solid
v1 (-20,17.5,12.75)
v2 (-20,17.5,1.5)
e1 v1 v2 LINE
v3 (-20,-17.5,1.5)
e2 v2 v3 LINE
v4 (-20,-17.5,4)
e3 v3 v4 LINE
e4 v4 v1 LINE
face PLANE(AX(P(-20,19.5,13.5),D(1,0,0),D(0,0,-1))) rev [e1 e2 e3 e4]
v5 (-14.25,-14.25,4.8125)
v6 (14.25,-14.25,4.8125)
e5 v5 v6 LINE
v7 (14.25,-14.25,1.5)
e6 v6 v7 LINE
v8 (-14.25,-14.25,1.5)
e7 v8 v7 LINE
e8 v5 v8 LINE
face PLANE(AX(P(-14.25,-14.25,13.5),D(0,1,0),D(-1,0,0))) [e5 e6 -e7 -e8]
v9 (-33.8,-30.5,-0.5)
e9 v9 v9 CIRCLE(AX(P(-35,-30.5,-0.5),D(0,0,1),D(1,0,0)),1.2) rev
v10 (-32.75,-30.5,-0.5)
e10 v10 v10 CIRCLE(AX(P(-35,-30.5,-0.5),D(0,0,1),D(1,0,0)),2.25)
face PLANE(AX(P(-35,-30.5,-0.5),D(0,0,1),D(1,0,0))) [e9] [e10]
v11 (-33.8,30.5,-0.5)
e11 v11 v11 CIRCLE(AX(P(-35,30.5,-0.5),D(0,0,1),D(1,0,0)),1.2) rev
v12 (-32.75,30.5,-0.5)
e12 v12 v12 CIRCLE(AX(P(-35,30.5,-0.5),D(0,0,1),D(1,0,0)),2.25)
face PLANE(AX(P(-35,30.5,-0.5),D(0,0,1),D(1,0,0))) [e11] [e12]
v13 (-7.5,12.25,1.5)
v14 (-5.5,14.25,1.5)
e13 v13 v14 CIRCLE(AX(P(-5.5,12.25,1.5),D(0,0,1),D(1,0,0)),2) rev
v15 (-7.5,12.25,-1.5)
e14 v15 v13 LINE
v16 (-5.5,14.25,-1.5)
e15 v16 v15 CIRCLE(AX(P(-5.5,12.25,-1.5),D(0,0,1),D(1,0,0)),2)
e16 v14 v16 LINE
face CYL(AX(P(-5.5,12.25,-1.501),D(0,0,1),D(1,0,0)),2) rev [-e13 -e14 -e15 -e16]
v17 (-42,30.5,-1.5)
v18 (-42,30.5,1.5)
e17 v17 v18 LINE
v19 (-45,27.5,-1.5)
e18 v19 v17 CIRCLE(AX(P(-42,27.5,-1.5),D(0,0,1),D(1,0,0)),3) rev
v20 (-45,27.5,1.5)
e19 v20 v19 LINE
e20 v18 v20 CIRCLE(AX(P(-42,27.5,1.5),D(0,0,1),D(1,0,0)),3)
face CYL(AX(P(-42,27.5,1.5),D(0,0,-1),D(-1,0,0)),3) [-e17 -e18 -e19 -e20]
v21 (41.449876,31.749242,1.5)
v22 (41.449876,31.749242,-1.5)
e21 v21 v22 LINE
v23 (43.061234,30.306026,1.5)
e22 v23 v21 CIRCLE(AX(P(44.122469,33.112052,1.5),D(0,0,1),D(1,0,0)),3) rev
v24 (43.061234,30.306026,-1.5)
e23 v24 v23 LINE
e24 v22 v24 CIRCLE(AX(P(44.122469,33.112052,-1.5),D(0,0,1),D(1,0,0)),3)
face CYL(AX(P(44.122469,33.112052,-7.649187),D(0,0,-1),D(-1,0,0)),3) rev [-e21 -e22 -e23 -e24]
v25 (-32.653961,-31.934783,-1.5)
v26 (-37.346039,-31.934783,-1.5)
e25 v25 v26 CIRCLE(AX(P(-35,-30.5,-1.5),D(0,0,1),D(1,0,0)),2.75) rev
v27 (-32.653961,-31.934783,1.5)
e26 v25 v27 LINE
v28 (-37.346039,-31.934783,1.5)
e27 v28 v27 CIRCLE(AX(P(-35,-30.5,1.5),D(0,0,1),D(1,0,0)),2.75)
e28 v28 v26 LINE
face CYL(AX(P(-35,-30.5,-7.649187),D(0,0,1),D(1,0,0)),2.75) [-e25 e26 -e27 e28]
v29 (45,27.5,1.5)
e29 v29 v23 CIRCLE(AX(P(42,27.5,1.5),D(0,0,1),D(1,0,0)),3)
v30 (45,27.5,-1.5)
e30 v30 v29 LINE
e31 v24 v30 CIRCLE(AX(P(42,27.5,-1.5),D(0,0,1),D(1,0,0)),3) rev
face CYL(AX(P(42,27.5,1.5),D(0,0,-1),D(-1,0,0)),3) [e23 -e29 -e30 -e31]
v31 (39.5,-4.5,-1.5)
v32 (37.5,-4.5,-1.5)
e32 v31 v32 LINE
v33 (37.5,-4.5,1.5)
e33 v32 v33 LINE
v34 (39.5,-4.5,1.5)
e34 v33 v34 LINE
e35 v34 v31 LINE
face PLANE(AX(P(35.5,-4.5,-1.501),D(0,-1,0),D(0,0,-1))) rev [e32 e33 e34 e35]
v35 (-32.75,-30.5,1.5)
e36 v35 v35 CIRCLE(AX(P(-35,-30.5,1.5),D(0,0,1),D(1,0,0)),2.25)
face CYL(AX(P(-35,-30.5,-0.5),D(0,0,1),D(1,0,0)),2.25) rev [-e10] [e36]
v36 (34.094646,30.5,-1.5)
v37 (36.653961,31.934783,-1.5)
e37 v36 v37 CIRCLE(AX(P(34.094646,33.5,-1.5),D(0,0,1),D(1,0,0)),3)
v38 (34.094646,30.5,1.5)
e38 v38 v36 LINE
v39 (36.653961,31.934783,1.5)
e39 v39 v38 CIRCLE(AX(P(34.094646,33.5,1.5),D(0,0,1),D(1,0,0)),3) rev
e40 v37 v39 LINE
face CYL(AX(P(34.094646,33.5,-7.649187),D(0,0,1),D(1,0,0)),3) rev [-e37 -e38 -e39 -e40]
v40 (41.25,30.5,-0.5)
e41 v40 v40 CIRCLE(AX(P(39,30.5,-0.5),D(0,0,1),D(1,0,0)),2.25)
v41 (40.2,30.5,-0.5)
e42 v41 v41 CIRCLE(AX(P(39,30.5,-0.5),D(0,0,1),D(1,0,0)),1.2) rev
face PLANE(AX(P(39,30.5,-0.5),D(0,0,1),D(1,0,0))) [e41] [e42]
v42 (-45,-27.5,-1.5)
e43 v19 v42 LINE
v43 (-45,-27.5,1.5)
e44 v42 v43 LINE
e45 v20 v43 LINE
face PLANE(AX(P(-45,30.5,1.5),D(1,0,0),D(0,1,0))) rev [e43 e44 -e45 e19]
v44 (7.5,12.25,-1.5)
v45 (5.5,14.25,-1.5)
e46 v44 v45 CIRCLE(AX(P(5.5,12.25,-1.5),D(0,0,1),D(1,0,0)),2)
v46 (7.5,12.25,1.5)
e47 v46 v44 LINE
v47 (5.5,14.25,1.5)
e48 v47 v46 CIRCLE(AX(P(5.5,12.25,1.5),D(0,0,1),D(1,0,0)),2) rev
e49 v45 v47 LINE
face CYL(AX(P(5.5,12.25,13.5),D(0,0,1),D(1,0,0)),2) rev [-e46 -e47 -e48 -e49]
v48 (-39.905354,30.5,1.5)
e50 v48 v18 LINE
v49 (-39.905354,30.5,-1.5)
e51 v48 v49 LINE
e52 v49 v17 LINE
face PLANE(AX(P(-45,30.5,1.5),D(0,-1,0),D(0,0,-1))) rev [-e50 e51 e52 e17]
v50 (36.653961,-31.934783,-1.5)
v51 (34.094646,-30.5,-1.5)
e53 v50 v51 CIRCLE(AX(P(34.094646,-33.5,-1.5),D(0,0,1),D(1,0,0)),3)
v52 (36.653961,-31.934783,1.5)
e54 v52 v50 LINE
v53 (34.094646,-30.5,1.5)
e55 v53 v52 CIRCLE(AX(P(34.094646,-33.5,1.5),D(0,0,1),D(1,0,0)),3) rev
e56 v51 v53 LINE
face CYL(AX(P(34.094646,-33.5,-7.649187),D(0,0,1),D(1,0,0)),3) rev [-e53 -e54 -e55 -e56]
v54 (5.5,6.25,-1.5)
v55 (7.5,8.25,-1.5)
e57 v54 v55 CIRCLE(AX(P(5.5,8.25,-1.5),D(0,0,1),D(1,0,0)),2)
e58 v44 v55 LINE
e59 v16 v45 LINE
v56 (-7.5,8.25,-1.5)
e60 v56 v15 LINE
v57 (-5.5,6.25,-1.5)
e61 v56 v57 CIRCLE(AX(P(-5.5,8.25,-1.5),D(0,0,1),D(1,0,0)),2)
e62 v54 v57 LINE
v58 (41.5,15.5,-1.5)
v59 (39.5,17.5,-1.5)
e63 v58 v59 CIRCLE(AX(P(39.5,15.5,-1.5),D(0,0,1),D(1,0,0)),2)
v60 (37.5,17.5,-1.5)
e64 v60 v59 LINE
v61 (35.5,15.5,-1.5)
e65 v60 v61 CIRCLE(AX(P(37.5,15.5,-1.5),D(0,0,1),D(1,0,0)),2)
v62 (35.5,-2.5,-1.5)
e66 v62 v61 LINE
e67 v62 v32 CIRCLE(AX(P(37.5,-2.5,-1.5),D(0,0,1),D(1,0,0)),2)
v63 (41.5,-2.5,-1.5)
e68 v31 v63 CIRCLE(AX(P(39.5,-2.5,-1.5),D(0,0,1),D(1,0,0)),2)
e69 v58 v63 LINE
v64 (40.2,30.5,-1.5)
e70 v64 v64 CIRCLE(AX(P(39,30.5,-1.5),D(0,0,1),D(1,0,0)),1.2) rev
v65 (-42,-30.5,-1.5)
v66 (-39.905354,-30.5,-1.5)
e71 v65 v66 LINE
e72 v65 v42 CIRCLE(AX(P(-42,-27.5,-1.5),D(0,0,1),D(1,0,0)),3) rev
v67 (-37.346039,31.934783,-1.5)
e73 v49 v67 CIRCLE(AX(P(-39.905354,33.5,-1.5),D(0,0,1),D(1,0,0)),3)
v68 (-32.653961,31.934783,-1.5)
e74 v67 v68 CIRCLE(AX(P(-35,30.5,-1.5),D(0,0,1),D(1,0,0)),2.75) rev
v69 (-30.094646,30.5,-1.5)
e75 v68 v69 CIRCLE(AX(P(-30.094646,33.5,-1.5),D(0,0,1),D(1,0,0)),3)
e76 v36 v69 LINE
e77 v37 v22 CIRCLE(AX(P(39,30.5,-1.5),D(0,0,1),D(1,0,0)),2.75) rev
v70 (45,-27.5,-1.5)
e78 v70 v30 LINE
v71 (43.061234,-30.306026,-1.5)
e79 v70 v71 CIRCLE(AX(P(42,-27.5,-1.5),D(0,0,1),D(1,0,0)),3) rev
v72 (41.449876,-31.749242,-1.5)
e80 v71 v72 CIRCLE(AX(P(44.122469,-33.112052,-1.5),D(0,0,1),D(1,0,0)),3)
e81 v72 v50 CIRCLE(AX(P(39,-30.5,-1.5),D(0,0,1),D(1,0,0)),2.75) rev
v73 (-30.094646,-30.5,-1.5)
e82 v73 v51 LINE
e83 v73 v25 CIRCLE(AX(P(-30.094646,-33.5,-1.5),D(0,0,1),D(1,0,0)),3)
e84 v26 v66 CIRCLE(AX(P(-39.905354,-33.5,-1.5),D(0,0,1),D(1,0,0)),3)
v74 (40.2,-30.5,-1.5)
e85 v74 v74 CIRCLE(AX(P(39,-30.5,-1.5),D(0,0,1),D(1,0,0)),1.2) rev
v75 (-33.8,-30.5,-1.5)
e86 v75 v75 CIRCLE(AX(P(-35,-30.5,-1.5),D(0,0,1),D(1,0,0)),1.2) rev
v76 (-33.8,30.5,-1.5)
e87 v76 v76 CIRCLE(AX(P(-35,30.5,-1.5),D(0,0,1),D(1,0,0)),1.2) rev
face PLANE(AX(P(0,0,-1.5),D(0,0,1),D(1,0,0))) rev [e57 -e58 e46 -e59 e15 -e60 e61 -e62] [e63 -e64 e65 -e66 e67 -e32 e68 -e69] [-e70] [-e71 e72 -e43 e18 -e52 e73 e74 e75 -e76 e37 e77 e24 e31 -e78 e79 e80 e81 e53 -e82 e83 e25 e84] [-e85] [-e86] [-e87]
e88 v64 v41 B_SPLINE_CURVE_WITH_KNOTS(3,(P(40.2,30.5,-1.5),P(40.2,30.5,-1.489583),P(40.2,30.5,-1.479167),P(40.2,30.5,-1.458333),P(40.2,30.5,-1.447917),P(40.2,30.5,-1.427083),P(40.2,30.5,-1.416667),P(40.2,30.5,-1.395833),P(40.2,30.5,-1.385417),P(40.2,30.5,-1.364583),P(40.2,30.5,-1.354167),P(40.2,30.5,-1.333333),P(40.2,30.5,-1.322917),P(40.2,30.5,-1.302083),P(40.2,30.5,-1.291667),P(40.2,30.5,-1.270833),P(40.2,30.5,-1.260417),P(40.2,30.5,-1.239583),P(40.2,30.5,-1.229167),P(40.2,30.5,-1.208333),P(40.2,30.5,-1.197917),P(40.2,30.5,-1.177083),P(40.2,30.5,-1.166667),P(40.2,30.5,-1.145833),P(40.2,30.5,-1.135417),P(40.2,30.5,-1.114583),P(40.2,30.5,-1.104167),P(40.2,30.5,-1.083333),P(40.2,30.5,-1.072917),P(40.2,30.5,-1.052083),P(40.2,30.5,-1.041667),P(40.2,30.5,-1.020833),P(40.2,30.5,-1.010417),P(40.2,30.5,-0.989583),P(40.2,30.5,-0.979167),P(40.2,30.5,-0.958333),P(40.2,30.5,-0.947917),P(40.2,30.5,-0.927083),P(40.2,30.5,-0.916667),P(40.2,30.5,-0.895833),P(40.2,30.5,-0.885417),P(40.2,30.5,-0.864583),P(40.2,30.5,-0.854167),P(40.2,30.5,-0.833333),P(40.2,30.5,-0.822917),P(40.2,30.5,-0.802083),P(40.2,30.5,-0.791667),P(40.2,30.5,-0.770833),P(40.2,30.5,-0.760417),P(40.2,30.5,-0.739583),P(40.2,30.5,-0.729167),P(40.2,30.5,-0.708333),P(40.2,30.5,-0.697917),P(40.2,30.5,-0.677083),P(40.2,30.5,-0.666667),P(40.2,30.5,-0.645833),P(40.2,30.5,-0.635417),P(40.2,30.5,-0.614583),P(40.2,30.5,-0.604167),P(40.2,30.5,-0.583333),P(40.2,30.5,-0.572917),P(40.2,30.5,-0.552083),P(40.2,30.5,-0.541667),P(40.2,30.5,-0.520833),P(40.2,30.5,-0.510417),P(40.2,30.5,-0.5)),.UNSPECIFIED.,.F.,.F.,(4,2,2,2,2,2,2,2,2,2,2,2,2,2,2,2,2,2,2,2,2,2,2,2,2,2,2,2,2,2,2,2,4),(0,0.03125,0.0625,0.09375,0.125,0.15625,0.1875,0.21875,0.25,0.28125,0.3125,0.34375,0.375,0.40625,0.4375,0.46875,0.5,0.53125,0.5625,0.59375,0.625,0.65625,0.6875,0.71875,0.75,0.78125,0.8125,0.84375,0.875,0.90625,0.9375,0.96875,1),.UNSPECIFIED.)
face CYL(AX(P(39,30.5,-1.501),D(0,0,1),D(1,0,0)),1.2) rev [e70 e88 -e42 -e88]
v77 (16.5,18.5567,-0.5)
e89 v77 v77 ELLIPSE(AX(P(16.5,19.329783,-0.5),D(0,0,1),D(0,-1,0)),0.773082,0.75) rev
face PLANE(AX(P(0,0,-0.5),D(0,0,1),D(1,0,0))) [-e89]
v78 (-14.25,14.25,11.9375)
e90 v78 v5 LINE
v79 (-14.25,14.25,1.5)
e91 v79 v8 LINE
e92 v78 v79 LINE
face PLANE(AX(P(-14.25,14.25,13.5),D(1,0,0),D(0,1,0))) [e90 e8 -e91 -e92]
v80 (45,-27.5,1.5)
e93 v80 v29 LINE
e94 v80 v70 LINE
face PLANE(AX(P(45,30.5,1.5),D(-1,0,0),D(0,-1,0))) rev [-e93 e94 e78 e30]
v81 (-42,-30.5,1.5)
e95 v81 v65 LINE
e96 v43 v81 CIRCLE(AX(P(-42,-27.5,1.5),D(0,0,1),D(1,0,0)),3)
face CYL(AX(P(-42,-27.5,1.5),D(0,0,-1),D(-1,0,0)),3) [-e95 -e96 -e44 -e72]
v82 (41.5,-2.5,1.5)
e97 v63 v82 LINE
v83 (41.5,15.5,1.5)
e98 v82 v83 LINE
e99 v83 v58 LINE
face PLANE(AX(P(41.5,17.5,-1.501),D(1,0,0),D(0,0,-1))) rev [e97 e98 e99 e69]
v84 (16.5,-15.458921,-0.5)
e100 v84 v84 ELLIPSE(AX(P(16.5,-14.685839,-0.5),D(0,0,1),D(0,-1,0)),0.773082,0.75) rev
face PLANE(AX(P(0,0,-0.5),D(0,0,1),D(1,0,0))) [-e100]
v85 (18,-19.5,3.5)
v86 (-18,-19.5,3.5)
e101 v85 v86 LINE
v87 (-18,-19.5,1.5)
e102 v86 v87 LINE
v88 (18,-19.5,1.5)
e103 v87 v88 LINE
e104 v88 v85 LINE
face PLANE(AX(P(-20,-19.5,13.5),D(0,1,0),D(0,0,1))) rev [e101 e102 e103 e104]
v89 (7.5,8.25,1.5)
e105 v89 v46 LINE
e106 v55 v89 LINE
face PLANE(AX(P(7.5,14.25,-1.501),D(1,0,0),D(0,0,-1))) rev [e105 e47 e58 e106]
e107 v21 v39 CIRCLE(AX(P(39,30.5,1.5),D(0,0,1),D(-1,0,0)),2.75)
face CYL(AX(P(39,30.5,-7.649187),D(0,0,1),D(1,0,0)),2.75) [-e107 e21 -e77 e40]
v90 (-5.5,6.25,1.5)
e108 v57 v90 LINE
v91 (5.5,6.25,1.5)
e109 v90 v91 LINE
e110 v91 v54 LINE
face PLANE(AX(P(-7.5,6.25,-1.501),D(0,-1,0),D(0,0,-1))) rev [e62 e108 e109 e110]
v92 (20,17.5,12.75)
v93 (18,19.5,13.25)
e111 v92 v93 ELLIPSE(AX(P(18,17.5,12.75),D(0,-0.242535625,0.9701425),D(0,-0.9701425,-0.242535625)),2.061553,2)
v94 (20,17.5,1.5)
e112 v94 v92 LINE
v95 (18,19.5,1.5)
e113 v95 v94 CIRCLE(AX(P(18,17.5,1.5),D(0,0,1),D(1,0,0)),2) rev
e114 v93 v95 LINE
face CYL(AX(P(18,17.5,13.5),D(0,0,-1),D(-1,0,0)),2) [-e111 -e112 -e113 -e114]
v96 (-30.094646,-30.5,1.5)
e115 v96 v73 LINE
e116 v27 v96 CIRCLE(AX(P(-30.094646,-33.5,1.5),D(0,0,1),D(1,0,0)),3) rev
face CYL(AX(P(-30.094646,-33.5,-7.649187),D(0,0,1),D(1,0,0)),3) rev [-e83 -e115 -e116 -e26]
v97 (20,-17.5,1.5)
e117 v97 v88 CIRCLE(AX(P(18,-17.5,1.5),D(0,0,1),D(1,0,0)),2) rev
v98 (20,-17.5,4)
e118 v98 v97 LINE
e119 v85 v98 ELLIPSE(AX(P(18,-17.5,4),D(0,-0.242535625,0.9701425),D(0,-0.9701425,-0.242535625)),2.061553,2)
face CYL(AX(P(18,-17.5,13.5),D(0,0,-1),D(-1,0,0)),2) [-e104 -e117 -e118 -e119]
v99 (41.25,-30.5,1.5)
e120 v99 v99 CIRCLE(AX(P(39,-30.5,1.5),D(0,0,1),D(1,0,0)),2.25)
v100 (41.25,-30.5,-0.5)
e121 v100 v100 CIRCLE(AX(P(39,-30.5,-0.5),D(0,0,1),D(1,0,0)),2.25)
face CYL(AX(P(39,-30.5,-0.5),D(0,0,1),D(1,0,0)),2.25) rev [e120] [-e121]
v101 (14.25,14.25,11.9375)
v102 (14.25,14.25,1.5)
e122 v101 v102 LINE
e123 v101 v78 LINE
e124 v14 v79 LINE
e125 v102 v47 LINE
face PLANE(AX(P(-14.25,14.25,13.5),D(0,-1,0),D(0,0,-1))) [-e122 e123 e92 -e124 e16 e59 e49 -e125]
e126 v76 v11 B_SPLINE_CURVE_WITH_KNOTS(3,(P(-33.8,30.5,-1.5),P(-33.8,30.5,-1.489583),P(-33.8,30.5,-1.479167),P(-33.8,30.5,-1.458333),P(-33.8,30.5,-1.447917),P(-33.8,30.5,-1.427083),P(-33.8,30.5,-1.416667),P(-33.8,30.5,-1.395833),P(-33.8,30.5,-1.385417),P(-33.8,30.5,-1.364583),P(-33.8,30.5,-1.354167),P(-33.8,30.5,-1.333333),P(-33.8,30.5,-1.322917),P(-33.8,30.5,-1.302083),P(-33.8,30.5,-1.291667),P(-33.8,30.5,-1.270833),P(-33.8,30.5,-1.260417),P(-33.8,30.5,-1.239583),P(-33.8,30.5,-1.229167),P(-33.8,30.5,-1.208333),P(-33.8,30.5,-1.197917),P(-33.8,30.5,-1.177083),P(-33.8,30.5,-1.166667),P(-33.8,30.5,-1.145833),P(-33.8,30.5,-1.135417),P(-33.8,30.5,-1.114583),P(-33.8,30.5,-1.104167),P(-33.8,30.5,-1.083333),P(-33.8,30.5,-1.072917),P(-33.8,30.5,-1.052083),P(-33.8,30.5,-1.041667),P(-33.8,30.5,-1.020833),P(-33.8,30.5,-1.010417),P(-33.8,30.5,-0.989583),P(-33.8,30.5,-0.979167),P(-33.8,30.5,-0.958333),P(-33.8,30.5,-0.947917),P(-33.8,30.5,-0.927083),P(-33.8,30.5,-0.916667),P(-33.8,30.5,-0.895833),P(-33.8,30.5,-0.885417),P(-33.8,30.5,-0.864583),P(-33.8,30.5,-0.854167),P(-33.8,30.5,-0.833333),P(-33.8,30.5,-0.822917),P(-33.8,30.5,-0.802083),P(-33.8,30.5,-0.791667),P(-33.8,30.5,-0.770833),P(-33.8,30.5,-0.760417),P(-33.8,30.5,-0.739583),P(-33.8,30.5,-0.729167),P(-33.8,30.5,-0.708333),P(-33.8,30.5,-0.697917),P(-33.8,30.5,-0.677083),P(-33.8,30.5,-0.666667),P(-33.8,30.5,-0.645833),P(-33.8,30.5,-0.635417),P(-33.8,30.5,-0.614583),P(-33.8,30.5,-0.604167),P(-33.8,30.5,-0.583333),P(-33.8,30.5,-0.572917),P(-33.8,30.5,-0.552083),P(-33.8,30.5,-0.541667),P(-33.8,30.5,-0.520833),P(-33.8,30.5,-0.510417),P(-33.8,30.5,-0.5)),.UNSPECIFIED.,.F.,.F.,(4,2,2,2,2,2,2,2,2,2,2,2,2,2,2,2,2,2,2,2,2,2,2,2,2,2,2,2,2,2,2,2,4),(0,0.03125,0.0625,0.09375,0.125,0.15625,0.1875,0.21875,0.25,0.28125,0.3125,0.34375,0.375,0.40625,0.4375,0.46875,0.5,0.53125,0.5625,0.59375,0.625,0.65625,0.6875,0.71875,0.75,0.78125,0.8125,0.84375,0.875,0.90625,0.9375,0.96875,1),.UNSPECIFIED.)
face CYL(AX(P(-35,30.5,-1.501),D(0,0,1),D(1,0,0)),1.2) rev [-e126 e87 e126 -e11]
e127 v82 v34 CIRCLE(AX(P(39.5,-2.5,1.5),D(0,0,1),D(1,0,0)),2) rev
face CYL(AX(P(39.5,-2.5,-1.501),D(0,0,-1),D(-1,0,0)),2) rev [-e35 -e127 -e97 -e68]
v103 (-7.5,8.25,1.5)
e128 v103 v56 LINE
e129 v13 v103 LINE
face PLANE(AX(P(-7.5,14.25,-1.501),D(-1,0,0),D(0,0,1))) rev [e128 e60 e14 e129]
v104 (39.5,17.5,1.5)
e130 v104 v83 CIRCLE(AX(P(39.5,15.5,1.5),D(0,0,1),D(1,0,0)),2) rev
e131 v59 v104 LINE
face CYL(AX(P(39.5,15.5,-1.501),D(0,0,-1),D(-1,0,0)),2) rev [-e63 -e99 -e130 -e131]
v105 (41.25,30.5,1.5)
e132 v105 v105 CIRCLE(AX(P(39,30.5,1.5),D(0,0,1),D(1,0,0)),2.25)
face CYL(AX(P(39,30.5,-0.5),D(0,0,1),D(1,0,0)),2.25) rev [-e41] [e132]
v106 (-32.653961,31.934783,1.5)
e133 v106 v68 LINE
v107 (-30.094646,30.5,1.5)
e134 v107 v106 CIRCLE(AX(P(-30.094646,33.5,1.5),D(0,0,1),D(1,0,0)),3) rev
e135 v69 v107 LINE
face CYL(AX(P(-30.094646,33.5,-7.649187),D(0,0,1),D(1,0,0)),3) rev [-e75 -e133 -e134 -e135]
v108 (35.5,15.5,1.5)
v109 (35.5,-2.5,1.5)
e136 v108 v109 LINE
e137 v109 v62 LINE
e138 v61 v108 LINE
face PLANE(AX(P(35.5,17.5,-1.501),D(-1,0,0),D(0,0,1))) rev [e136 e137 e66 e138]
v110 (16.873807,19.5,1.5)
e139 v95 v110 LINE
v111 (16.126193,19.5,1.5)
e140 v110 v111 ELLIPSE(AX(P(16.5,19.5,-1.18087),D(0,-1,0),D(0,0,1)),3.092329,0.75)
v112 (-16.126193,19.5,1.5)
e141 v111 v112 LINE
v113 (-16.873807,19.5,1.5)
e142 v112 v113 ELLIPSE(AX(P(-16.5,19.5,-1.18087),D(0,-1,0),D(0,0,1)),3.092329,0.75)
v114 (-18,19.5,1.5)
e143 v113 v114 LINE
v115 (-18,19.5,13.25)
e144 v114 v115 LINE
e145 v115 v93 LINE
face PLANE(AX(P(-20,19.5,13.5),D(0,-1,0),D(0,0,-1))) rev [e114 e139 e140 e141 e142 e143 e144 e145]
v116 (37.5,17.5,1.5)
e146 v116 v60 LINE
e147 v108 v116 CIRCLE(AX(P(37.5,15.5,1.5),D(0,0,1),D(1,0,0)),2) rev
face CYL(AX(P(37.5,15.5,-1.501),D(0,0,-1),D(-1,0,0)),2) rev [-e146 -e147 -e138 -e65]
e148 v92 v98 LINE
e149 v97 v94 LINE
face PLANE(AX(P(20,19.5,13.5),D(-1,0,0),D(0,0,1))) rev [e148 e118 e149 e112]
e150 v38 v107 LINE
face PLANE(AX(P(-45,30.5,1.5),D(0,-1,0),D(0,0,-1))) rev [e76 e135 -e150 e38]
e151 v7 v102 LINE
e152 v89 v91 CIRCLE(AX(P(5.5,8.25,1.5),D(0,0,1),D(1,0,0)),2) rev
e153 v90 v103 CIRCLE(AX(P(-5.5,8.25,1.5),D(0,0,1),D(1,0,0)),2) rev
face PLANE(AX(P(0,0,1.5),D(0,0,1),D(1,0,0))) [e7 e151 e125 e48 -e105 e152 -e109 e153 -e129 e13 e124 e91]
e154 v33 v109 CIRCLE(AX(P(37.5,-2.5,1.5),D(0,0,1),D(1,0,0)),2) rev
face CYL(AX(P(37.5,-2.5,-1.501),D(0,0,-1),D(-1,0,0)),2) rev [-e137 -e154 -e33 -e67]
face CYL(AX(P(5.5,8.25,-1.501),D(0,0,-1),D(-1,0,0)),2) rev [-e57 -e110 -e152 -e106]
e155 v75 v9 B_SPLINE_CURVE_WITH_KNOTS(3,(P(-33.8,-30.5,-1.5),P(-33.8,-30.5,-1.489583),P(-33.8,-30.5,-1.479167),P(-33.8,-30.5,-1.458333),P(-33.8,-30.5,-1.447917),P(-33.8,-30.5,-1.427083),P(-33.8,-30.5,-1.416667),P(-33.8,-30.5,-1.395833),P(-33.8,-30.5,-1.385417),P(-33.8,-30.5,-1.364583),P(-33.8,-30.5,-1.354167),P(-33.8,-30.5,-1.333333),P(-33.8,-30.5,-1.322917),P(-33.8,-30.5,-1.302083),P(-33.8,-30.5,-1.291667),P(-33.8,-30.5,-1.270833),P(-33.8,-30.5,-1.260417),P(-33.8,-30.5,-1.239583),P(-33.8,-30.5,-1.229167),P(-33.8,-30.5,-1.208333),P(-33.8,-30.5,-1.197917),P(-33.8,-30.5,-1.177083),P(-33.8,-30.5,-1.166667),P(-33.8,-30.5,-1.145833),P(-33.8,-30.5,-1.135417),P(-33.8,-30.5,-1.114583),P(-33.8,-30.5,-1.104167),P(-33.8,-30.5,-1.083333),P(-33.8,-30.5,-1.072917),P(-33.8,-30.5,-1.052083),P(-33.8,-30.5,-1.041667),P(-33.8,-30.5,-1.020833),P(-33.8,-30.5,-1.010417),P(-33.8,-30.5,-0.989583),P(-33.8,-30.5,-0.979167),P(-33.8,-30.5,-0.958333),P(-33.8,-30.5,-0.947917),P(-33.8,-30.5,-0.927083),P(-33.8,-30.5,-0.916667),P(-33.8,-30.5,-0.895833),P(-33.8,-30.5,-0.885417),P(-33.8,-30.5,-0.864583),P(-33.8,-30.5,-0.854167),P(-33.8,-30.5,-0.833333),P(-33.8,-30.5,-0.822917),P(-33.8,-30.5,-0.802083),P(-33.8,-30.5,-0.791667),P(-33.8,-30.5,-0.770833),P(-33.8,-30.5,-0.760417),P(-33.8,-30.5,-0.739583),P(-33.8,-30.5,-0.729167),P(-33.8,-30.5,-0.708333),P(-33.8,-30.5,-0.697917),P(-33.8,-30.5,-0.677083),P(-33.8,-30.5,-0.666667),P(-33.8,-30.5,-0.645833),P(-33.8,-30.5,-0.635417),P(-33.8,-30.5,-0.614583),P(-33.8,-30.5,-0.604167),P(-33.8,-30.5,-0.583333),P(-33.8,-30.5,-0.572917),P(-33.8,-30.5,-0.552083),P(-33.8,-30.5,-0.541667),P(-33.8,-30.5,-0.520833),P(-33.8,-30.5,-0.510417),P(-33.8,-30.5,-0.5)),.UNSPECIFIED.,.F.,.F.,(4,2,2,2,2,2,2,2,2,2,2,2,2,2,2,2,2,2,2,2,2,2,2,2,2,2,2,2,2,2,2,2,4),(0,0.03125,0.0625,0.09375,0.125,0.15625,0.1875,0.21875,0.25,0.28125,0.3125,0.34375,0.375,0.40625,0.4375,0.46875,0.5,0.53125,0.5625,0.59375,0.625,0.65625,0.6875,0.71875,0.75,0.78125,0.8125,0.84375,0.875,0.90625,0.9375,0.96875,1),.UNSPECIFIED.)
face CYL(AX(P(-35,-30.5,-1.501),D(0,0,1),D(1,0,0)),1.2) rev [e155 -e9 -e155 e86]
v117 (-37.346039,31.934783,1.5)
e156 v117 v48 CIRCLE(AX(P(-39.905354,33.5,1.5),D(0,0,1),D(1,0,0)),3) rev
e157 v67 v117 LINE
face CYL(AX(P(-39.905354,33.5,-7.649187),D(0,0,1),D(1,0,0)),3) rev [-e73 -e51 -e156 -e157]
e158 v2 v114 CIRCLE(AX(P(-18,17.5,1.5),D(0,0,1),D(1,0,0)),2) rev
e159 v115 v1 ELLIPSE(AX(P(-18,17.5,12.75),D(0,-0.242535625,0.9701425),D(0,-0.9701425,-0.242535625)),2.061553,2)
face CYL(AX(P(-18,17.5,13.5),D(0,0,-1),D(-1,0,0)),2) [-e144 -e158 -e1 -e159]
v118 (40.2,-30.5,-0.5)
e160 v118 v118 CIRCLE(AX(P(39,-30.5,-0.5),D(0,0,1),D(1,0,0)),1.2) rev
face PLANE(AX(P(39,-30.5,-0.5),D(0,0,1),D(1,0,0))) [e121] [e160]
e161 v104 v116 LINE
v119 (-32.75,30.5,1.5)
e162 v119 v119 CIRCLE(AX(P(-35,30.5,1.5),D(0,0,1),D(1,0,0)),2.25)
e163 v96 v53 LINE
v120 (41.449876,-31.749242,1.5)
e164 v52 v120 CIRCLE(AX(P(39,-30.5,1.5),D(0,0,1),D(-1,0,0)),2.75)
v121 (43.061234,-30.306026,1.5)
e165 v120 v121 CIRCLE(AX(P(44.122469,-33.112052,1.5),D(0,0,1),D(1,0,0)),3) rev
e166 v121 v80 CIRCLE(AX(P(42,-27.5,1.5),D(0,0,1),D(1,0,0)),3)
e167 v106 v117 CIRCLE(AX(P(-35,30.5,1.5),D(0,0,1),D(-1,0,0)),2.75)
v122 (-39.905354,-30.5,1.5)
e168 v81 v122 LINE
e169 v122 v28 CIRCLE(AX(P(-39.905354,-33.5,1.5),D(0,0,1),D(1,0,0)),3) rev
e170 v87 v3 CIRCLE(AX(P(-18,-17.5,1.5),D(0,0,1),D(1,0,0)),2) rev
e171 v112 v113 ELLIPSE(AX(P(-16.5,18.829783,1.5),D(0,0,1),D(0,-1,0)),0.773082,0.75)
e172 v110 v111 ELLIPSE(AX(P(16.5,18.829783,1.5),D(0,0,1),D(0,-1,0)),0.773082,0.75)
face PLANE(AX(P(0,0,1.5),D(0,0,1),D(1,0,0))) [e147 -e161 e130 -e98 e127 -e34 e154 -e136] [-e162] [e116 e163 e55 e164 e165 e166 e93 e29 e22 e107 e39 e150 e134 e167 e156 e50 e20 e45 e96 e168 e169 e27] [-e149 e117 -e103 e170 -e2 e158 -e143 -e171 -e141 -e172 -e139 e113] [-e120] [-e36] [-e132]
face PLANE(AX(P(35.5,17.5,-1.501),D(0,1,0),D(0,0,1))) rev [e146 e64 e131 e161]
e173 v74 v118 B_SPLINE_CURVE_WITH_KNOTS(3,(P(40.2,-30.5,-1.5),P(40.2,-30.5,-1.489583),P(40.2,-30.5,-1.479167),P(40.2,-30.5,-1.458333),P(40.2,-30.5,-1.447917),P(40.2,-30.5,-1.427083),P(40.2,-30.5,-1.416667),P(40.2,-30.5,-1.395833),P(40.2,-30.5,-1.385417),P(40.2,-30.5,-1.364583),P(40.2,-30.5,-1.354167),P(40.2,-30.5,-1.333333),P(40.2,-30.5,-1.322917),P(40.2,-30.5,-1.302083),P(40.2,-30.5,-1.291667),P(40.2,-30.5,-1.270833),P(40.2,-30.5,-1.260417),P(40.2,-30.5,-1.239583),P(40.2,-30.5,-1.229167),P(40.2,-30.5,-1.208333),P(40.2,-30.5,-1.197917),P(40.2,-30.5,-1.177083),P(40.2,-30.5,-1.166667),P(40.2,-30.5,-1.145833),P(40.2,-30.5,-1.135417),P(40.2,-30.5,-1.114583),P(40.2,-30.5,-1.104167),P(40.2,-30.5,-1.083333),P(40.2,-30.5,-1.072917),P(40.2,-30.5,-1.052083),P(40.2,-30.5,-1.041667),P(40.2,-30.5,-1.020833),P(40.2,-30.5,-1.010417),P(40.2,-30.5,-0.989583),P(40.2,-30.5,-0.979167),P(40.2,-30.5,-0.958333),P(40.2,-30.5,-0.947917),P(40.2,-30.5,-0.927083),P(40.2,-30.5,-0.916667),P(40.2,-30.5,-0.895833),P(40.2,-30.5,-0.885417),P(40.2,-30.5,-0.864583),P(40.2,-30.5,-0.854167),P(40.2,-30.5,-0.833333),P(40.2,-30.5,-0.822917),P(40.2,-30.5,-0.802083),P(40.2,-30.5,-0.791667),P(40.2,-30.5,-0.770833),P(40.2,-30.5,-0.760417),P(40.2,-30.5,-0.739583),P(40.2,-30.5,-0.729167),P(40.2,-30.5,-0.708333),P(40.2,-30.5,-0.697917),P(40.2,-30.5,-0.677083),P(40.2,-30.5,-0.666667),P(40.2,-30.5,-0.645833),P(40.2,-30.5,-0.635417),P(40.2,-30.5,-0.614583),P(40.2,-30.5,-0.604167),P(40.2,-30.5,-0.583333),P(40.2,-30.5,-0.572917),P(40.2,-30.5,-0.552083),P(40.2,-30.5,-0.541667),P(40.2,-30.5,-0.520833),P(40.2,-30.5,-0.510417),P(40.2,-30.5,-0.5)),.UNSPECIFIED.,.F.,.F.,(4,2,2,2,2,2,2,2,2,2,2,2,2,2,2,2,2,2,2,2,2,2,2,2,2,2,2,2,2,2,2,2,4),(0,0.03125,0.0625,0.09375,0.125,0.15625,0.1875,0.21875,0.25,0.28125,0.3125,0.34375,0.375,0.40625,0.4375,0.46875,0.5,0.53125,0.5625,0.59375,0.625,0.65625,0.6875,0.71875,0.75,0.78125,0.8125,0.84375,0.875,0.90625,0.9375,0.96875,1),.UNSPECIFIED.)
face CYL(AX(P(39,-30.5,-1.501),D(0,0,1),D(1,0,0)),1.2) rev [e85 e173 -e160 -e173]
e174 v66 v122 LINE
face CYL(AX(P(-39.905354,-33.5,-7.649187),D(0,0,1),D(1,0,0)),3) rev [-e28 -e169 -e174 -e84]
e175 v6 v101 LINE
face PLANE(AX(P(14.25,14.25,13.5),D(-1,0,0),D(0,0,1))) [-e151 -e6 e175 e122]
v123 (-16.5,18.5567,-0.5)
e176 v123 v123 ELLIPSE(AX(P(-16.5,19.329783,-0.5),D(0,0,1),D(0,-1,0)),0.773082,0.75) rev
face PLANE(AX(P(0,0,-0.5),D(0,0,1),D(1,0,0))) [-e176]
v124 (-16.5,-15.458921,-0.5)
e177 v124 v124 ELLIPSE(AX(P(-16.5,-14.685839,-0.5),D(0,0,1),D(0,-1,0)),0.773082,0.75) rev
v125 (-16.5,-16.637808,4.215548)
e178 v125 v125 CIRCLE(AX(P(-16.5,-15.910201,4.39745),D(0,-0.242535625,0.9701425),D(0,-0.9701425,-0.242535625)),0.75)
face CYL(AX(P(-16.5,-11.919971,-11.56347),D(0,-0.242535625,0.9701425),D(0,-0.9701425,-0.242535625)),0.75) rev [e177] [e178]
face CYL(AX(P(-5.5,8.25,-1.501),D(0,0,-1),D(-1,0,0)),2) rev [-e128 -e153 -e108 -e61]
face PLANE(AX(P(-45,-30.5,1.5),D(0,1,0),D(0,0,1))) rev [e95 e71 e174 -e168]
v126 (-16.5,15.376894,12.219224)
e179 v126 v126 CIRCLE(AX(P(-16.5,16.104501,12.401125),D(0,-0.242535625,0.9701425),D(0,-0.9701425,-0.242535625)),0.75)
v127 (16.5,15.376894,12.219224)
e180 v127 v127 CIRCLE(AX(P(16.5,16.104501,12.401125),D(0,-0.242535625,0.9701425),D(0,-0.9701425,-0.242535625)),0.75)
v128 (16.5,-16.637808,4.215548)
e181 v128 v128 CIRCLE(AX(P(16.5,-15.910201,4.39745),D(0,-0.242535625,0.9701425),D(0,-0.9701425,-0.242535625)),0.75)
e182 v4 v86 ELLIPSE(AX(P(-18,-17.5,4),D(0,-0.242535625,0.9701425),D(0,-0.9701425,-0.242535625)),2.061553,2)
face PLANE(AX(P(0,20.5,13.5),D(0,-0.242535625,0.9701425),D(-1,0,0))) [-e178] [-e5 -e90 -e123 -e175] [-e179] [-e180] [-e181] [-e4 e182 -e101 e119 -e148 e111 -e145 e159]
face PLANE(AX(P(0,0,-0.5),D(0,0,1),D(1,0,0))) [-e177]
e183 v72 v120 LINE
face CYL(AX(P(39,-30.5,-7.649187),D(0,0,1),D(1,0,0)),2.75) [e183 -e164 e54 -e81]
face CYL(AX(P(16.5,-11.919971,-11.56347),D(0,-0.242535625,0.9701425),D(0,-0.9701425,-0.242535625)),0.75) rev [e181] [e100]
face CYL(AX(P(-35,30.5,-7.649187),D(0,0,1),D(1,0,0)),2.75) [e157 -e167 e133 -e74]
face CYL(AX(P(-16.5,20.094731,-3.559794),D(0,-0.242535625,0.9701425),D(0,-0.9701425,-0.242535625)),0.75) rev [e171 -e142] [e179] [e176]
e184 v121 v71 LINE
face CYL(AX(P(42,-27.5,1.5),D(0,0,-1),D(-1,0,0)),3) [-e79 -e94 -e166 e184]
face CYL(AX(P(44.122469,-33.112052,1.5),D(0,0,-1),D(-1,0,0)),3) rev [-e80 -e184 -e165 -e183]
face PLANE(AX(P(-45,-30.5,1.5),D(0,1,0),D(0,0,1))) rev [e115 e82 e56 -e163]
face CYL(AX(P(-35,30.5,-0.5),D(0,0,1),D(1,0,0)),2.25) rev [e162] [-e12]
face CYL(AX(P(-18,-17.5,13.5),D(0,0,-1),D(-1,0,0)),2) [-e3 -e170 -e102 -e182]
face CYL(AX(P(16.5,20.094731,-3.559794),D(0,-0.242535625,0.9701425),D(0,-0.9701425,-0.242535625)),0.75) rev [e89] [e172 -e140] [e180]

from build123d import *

# Parameters (mm, degrees)
SKETCH_29_W                          = 90
SKETCH_29_H                          = 61
EXTRUDE_5047_DEPTH                   = 1.5
CUT_EXTRUDE_5288_REACH               = 56.445
SKETCH_30_W                          = 6
SKETCH_30_H                          = 22
FILLET_3_R                           = 3
EXTRUDE_6672_DEPTH                   = 3
CUT_EXTRUDE_7204_REACH               = 58.032
SKETCH_34_R                          = 1.2
SKETCH_35_R                          = 2.25
CUT_EXTRUDE_7829_DEPTH               = 2
FILLET_5_R                           = 2
SKETCH_36_W                          = 40
SKETCH_36_H                          = 39
SKETCH_36_W_2                        = 28.5
SKETCH_36_H_2                        = 28.5
EXTRUDE_8958_DEPTH                   = 12
CHAMFER_2_SIZE                       = 10
CHAMFER_2_SIZE_2                     = 40
CUT_EXTRUDE_9379_REACH               = 60.91
CUT_EXTRUDE_9379_OFFSET_FROM_SURFACE = 1
SKETCH_37_R                          = 0.75
CUT_EXTRUDE_9641_REACH               = 59.172
SKETCH_38_W                          = 15
SKETCH_38_H                          = 8
FILLET_6_R                           = 2
FILLET_7_R                           = 2
FILLET_8_R                           = 3


with BuildPart() as part:
    # Эскиз29 → Extrude 5047 (new, symmetric)
    with BuildSketch(Plane.XY):
        Rectangle(SKETCH_29_W, SKETCH_29_H)
    extrude(amount=EXTRUDE_5047_DEPTH, both=True)

    # Эскиз30 → Cut-Extrude 5288 (cut, up to next)
    with BuildSketch(Plane.XY.offset(1.5), mode=Mode.PRIVATE) as cut_extrude_5288_sk1:
        with Locations((38.5, 6.5)):
            Rectangle(SKETCH_30_W, SKETCH_30_H)
    cut_extrude_5288_tool1 = extrude(cut_extrude_5288_sk1.sketch, amount=-CUT_EXTRUDE_5288_REACH, mode=Mode.PRIVATE) & part.part
    add(cut_extrude_5288_tool1.solids().sort_by_distance((38.5, 6.5, 1.5))[0], mode=Mode.SUBTRACT)

    # Скругление3
    fillet_3_edges = [part.edges().sort_by_distance(p)[0] for p in [
        (-45, 30.5, 0),
        (45, 30.5, 0),
        (45, -30.5, 0),
        (-45, -30.5, 0),
    ]]
    fillet(fillet_3_edges, radius=FILLET_3_R)

    # Эскиз33 → Extrude 6672 (add)
    with BuildSketch(Plane.XY.offset(1.5)):
        with BuildLine():
            Line((-37.75, -30.5), (-32.25, -30.5))
            ThreePointArc((-32.25, -30.5), (-35, -33.25), (-37.75, -30.5))
        make_face()
        with BuildLine():
            Line((-37.75, 30.5), (-32.25, 30.5))
            ThreePointArc((-32.25, 30.5), (-35, 33.25), (-37.75, 30.5))
        make_face()
        with BuildLine():
            Line((41.75, -30.5), (36.25, -30.5))
            ThreePointArc((36.25, -30.5), (39, -33.25), (41.75, -30.5))
        make_face()
        with BuildLine():
            Line((36.25, 30.5), (41.75, 30.5))
            ThreePointArc((41.75, 30.5), (39, 33.25), (36.25, 30.5))
        make_face()
    extrude(amount=-EXTRUDE_6672_DEPTH)

    # Эскиз34 → Cut-Extrude 7204 (cut, up to next)
    with BuildSketch(Plane.XY.offset(1.5), mode=Mode.PRIVATE) as cut_extrude_7204_sk1:
        with Locations((-35, -30.5)):
            Circle(SKETCH_34_R)
    cut_extrude_7204_tool1 = extrude(cut_extrude_7204_sk1.sketch, amount=-CUT_EXTRUDE_7204_REACH, mode=Mode.PRIVATE) & part.part
    # Эскиз34 → Cut-Extrude 7204 (cut, up to next)
    with BuildSketch(Plane.XY.offset(1.5), mode=Mode.PRIVATE) as cut_extrude_7204_sk2:
        with Locations((39, -30.5)):
            Circle(SKETCH_34_R)
    cut_extrude_7204_tool2 = extrude(cut_extrude_7204_sk2.sketch, amount=-CUT_EXTRUDE_7204_REACH, mode=Mode.PRIVATE) & part.part
    # Эскиз34 → Cut-Extrude 7204 (cut, up to next)
    with BuildSketch(Plane.XY.offset(1.5), mode=Mode.PRIVATE) as cut_extrude_7204_sk3:
        with Locations((-35, 30.5)):
            Circle(SKETCH_34_R)
    cut_extrude_7204_tool3 = extrude(cut_extrude_7204_sk3.sketch, amount=-CUT_EXTRUDE_7204_REACH, mode=Mode.PRIVATE) & part.part
    # Эскиз34 → Cut-Extrude 7204 (cut, up to next)
    with BuildSketch(Plane.XY.offset(1.5), mode=Mode.PRIVATE) as cut_extrude_7204_sk4:
        with Locations((39, 30.5)):
            Circle(SKETCH_34_R)
    cut_extrude_7204_tool4 = extrude(cut_extrude_7204_sk4.sketch, amount=-CUT_EXTRUDE_7204_REACH, mode=Mode.PRIVATE) & part.part
    add(cut_extrude_7204_tool1.solids().sort_by_distance((-35, -30.5, 1.5))[0], mode=Mode.SUBTRACT)
    add(cut_extrude_7204_tool2.solids().sort_by_distance((39, -30.5, 1.5))[0], mode=Mode.SUBTRACT)
    add(cut_extrude_7204_tool3.solids().sort_by_distance((-35, 30.5, 1.5))[0], mode=Mode.SUBTRACT)
    add(cut_extrude_7204_tool4.solids().sort_by_distance((39, 30.5, 1.5))[0], mode=Mode.SUBTRACT)

    # Эскиз35 → Cut-Extrude 7829 (cut)
    with BuildSketch(Plane.XY.offset(1.5)):
        with Locations((-35, -30.5)):
            Circle(SKETCH_35_R)
        with Locations((-35, 30.5)):
            Circle(SKETCH_35_R)
        with Locations((39, -30.5)):
            Circle(SKETCH_35_R)
        with Locations((39, 30.5)):
            Circle(SKETCH_35_R)
    extrude(amount=-CUT_EXTRUDE_7829_DEPTH, mode=Mode.SUBTRACT)

    # Скругление5
    fillet_5_edges = [part.edges().sort_by_distance(p)[0] for p in [
        (35.5, -4.5, 0),
        (35.5, 17.5, 0),
        (41.5, 17.5, 0),
        (41.5, -4.5, 0),
    ]]
    fillet(fillet_5_edges, radius=FILLET_5_R)

    # Эскиз36 → Extrude 8958 (add)
    with BuildSketch(Plane.XY.offset(1.5)):
        Rectangle(SKETCH_36_W, SKETCH_36_H)
        Rectangle(SKETCH_36_W_2, SKETCH_36_H_2, mode=Mode.SUBTRACT)
    extrude(amount=EXTRUDE_8958_DEPTH)

    # Фаска2
    # the kernel refuses this chamfer: 40, 10 mm, written as the material it takes off along each edge
    with BuildSketch(Plane(origin=(123.885099991, -19.5, 13.5), x_dir=(0, -0.14778356633657133, -0.9890197255468893), z_dir=(-1, 0, 0))) as chamfer_2_piece_1:
        Polygon((CHAMFER_2_SIZE * 0.989019725547, -CHAMFER_2_SIZE * 0.147783566337), (-CHAMFER_2_SIZE_2 * 0.147783566337, -CHAMFER_2_SIZE_2 * 0.989019725547), (0, 0), align=None)
    extrude(amount=247.770199982, mode=Mode.SUBTRACT)

    # Cut-Extrude 9379: up to this face of the body (flat: up to its plane, moved by the offset)
    cut_extrude_9379_end = Plane(part.part.faces().sort_by_distance((-0.908572553, -0.15524083, -1.5))[0]).offset(-CUT_EXTRUDE_9379_OFFSET_FROM_SURFACE)
    # Эскиз37 → Cut-Extrude 9379 (cut, up to the picked face)
    with BuildSketch(Plane(origin=(0, -1.970588235, 7.882352941), x_dir=(1, 0, 0), z_dir=(0, -0.24253562503633005, 0.9701425001453328)), mode=Mode.PRIVATE) as cut_extrude_9379_sk1:
        with Locations(Location((-16.5, 18.631375785, 0), (0, 0, 270))):
            Circle(SKETCH_37_R)
    cut_extrude_9379_tool1 = split(extrude(cut_extrude_9379_sk1.sketch, amount=-CUT_EXTRUDE_9379_REACH, mode=Mode.PRIVATE), bisect_by=cut_extrude_9379_end, keep=Keep.BOTH, mode=Mode.PRIVATE)
    # Эскиз37 → Cut-Extrude 9379 (cut, up to the picked face)
    with BuildSketch(Plane(origin=(0, -1.970588235, 7.882352941), x_dir=(1, 0, 0), z_dir=(0, -0.24253562503633005, 0.9701425001453328)), mode=Mode.PRIVATE) as cut_extrude_9379_sk2:
        with Locations(Location((16.5, 18.631375785, 0), (0, 0, 270))):
            Circle(SKETCH_37_R)
    cut_extrude_9379_tool2 = split(extrude(cut_extrude_9379_sk2.sketch, amount=-CUT_EXTRUDE_9379_REACH, mode=Mode.PRIVATE), bisect_by=cut_extrude_9379_end, keep=Keep.BOTH, mode=Mode.PRIVATE)
    # Эскиз37 → Cut-Extrude 9379 (cut, up to the picked face)
    with BuildSketch(Plane(origin=(0, -1.970588235, 7.882352941), x_dir=(1, 0, 0), z_dir=(0, -0.24253562503633005, 0.9701425001453328)), mode=Mode.PRIVATE) as cut_extrude_9379_sk3:
        with Locations(Location((16.5, -14.368624215, 0), (0, 0, 270))):
            Circle(SKETCH_37_R)
    cut_extrude_9379_tool3 = split(extrude(cut_extrude_9379_sk3.sketch, amount=-CUT_EXTRUDE_9379_REACH, mode=Mode.PRIVATE), bisect_by=cut_extrude_9379_end, keep=Keep.BOTH, mode=Mode.PRIVATE)
    # Эскиз37 → Cut-Extrude 9379 (cut, up to the picked face)
    with BuildSketch(Plane(origin=(0, -1.970588235, 7.882352941), x_dir=(1, 0, 0), z_dir=(0, -0.24253562503633005, 0.9701425001453328)), mode=Mode.PRIVATE) as cut_extrude_9379_sk4:
        with Locations(Location((-16.5, -14.368624215, 0), (0, 0, 270))):
            Circle(SKETCH_37_R)
    cut_extrude_9379_tool4 = split(extrude(cut_extrude_9379_sk4.sketch, amount=-CUT_EXTRUDE_9379_REACH, mode=Mode.PRIVATE), bisect_by=cut_extrude_9379_end, keep=Keep.BOTH, mode=Mode.PRIVATE)
    add(cut_extrude_9379_tool1.solids().sort_by(Axis((-16.5, 16.104501, 12.401125), (0, 0.24253562503633005, -0.9701425001453328)))[0], mode=Mode.SUBTRACT)
    add(cut_extrude_9379_tool2.solids().sort_by(Axis((16.5, 16.104501, 12.401125), (0, 0.24253562503633005, -0.9701425001453328)))[0], mode=Mode.SUBTRACT)
    add(cut_extrude_9379_tool3.solids().sort_by(Axis((16.5, -15.910201, 4.39745), (0, 0.24253562503633005, -0.9701425001453328)))[0], mode=Mode.SUBTRACT)
    add(cut_extrude_9379_tool4.solids().sort_by(Axis((-16.5, -15.910201, 4.39745), (0, 0.24253562503633005, -0.9701425001453328)))[0], mode=Mode.SUBTRACT)

    # Эскиз38 → Cut-Extrude 9641 (cut, up to next)
    with BuildSketch(Plane.XY.offset(1.5), mode=Mode.PRIVATE) as cut_extrude_9641_sk1:
        with Locations((0, 10.25)):
            Rectangle(SKETCH_38_W, SKETCH_38_H)
    cut_extrude_9641_tool1 = extrude(cut_extrude_9641_sk1.sketch, amount=-CUT_EXTRUDE_9641_REACH, mode=Mode.PRIVATE) & part.part
    add(cut_extrude_9641_tool1.solids().sort_by_distance((0, 10.25, 1.5))[0], mode=Mode.SUBTRACT)

    # Скругление6
    fillet_6_edges = [part.edges().sort_by_distance(p)[0] for p in [
        (-7.5, 6.25, 0),
        (-7.5, 14.25, 0),
        (7.5, 14.25, 0),
        (7.5, 6.25, 0),
    ]]
    fillet(fillet_6_edges, radius=FILLET_6_R)

    # Скругление7
    fillet_7_edges = [part.edges().sort_by_distance(p)[0] for p in [
        (-20, 19.5, 7.375),
        (20, 19.5, 7.375),
        (20, -19.5, 2.5),
        (-20, -19.5, 2.5),
    ]]
    fillet(fillet_7_edges, radius=FILLET_7_R)

    # Скругление8
    fillet_8_edges = [part.edges().sort_by_distance(p)[0] for p in [
        (-37.75, 30.5, 0),
        (-32.25, 30.5, 0),
        (41.75, -30.5, 0),
        (36.25, -30.5, 0),
        (-32.25, -30.5, 0),
        (-37.75, -30.5, 0),
        (36.25, 30.5, 0),
        (41.75, 30.5, 0),
    ]]
    fillet(fillet_8_edges, radius=FILLET_8_R)


solid = part.part
